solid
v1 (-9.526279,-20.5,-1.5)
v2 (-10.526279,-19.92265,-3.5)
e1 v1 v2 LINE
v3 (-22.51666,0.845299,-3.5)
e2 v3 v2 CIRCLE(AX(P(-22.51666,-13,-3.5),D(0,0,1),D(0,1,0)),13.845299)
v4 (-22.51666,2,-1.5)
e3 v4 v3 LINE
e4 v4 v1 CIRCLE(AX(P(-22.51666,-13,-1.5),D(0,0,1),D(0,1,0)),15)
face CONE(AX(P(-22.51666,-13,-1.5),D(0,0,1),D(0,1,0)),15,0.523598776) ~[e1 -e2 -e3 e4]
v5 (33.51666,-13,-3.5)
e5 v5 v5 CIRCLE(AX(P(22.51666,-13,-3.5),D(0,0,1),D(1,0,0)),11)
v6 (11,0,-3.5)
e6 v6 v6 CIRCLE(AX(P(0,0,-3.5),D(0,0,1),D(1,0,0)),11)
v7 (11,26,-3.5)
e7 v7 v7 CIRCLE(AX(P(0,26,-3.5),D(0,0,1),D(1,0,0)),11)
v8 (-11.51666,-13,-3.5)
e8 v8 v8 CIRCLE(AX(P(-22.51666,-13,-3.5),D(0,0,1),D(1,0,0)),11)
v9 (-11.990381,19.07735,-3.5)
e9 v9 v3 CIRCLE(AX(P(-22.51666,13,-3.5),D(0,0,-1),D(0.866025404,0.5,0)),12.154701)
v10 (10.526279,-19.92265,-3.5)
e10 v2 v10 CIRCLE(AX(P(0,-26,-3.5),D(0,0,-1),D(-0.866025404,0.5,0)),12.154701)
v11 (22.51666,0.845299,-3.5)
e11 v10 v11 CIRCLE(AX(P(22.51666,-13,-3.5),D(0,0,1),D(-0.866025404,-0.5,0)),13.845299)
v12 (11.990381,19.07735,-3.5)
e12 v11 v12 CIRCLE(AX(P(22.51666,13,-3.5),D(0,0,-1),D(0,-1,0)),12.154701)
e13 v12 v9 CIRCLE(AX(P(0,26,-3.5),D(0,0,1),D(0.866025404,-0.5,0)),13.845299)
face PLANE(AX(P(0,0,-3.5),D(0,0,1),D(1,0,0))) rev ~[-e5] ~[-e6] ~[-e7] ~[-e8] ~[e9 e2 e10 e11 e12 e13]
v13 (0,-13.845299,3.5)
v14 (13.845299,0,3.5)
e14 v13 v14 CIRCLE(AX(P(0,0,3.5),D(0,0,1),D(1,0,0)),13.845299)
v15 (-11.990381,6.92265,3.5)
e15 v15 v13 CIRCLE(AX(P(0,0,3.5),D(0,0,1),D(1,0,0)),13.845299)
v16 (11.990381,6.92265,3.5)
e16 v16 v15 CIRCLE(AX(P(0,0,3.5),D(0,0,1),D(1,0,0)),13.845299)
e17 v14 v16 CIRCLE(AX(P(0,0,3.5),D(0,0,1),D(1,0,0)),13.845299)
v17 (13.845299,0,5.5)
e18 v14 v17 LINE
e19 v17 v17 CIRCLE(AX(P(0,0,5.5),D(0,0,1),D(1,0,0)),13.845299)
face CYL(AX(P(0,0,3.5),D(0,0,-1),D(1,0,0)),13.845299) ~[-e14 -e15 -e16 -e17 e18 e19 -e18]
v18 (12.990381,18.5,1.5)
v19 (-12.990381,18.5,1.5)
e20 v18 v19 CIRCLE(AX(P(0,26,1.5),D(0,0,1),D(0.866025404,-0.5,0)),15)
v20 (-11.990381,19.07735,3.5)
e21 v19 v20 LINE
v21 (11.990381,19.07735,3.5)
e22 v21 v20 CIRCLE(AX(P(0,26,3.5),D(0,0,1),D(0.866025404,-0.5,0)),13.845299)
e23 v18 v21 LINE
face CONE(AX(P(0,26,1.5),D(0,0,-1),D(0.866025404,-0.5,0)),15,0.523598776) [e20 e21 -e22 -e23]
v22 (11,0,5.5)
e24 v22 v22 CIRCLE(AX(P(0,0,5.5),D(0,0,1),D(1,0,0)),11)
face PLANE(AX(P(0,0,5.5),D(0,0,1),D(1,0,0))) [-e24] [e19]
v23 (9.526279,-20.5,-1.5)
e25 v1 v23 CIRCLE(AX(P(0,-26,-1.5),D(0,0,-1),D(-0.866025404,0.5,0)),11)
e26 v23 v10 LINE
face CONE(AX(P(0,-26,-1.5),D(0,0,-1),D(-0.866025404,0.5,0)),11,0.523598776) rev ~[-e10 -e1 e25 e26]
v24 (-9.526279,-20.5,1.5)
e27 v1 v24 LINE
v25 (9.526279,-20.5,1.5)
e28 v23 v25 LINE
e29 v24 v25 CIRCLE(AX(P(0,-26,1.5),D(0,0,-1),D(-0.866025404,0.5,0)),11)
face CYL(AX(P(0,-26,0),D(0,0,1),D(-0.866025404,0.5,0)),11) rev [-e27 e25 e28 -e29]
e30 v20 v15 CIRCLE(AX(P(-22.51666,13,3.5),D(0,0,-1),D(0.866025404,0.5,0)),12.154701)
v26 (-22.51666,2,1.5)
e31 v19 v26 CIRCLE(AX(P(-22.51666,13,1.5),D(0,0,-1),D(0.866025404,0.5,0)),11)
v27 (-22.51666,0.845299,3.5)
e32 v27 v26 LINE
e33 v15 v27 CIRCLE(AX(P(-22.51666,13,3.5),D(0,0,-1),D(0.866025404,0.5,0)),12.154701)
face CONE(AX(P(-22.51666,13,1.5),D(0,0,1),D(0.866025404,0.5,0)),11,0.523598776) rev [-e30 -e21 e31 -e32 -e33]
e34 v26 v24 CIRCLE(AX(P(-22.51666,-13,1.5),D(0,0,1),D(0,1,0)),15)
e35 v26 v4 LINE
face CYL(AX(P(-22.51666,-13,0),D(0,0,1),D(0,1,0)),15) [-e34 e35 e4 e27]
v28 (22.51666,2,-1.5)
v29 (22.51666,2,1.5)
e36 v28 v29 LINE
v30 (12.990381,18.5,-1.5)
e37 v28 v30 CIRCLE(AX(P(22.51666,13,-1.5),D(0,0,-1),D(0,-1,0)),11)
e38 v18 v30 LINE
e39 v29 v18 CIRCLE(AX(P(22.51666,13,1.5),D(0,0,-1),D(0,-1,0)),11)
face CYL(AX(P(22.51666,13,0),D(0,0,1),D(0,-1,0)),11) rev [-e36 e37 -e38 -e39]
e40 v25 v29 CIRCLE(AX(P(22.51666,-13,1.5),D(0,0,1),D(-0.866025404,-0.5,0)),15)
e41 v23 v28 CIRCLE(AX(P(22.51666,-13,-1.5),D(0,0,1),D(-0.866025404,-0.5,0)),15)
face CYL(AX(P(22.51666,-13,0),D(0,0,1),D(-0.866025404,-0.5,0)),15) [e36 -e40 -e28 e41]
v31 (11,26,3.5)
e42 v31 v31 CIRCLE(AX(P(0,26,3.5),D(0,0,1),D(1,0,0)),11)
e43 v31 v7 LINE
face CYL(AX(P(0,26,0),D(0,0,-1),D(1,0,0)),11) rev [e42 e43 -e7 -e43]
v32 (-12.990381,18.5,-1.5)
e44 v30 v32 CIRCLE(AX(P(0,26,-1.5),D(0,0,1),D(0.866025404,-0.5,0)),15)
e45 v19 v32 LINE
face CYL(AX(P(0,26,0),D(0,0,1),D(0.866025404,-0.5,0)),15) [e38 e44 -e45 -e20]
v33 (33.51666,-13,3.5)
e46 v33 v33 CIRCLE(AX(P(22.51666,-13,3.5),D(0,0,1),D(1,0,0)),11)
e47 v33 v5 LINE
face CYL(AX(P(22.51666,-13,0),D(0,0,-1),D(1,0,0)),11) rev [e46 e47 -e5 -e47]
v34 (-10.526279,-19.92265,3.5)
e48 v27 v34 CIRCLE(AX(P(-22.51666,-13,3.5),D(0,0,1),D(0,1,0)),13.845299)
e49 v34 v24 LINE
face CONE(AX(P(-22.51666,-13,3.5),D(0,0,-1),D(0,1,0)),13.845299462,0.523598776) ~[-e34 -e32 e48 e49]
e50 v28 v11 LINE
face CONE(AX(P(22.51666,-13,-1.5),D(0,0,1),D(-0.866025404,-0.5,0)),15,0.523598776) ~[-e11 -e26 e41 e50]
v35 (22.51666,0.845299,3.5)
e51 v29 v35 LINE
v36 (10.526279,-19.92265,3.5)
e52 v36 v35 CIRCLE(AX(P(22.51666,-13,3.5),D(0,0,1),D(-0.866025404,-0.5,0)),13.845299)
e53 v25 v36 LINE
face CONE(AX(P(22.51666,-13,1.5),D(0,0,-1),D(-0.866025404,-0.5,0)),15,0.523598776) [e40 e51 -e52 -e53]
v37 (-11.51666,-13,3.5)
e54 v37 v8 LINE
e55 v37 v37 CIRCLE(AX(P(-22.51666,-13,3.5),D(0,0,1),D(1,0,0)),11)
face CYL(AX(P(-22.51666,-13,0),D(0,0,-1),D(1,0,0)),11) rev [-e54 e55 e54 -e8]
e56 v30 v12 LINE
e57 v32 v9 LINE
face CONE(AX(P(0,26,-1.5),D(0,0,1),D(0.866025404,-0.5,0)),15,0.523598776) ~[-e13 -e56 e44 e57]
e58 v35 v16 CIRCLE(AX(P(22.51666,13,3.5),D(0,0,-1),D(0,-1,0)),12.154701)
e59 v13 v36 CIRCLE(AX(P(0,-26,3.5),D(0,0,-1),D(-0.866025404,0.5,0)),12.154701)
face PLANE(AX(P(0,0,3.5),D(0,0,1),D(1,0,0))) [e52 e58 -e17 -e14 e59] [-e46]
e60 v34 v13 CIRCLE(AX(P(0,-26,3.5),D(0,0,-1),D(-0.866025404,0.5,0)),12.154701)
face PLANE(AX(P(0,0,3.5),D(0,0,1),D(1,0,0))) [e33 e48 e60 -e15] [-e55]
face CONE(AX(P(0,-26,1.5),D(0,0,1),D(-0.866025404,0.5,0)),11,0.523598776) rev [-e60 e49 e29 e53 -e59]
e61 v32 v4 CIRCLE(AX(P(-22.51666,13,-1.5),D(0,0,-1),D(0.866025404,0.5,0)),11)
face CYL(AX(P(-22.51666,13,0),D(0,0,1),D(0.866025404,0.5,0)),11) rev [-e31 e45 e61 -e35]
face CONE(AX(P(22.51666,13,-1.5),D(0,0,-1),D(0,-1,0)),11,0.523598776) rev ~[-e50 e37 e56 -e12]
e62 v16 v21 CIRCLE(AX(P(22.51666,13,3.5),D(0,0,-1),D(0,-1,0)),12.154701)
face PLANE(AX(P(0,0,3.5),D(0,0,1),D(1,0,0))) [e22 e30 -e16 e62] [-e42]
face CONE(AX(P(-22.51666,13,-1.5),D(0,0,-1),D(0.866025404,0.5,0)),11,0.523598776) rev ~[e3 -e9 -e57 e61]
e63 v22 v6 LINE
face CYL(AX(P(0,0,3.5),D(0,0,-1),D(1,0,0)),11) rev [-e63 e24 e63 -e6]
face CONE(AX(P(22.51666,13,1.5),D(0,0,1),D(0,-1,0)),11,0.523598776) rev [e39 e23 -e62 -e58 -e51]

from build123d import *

# Parameters (mm, degrees)
F0_R          = 11
F1_DEPTH      = 3.5
F2_R          = 11
F3_DEPTH      = 3.501
F3_DEPTH_BACK = 3.501
F4_T2_ANGLE   = 240
F4_T4_ANGLE   = 240
F4_T6_ANGLE   = 120
F4_T8_ANGLE   = 120
F4_T10_ANGLE  = 240
F4_T12_ANGLE  = 240
F4_T14_ANGLE  = 120
F4_T16_ANGLE  = 120
F4_T18_ANGLE  = 240
F4_T20_ANGLE  = 240
F4_T22_ANGLE  = 120
F4_T24_ANGLE  = 120
F5_R          = 13.8452994616
F5_R_2        = 11
F6_DEPTH      = 2


# Not quite as in the source:
# - a fillet or chamfer that OpenCascade refuses, or shapes differently, is made with other operations: its cross-section is extruded or revolved along the edge and cut away or added


with BuildPart() as f1:
    # F0 (on Top) → F1 (new body, symmetric)
    with BuildSketch(Plane.XY):
        with BuildLine():
            ThreePointArc((-22.5166604984, 2), (-35.5070415552, -20.5), (-9.5262794416, -20.5))
            ThreePointArc((-9.5262794416, -20.5), (0, -15), (9.5262794416, -20.5))
            ThreePointArc((9.5262794416, -20.5), (35.5070415552, -20.5), (22.5166604984, 2))
            ThreePointArc((22.5166604984, 2), (12.9903810568, 7.5), (12.9903810568, 18.5))
            ThreePointArc((12.9903810568, 18.5), (0, 41), (-12.9903810568, 18.5))
            ThreePointArc((-12.9903810568, 18.5), (-12.9903810568, 7.5), (-22.5166604984, 2))
        make_face()
        with Locations((-22.5166604984, -13)):
            Circle(F0_R, mode=Mode.SUBTRACT)
        with Locations((22.5166604984, -13)):
            Circle(F0_R, mode=Mode.SUBTRACT)
        Circle(F0_R, mode=Mode.SUBTRACT)
        with Locations((0, 26)):
            Circle(F0_R, mode=Mode.SUBTRACT)
    extrude(amount=F1_DEPTH, both=True)

    # F2 (on Top) → F3 (cut, two sides)
    with BuildSketch(Plane.XY) as f3_sk:
        Circle(F2_R)
    extrude(amount=-F3_DEPTH, mode=Mode.SUBTRACT)
    extrude(f3_sk.sketch, amount=F3_DEPTH_BACK, mode=Mode.SUBTRACT)

    # F4: chamfer of 2 x 1.1547005384 on 12 edges, made by hand

    # F4_s1 → F4_t2 (revolve, cut)
    with BuildSketch(Plane.YZ.offset(-22.5166604984)):
        Polygon((0.8452994616, 3.5), (2, 1.5), (2, 3.5), align=None)
    revolve(axis=Axis((-22.5166604984, -13, 3.5), (0, 0, 1)), revolution_arc=F4_T2_ANGLE, mode=Mode.SUBTRACT)

    # F4_s3 → F4_t4 (revolve, cut)
    with BuildSketch(Plane.YZ.offset(-22.5166604984)):
        Polygon((2, -1.5), (0.8452994616, -3.5), (2, -3.5), align=None)
    revolve(axis=Axis((-22.5166604984, -13, -3.5), (0, 0, 1)), revolution_arc=F4_T4_ANGLE, mode=Mode.SUBTRACT)

    # F4_s5 → F4_t6 (revolve, cut)
    with BuildSketch(Plane(origin=(-11.2583302492, 19.5, 0), x_dir=(0, 0, 1), z_dir=(-0.5, 0.8660254038, 0))):
        Polygon((-1.5, -2), (-3.5, -0.8452994616), (-3.5, -2), align=None)
    revolve(axis=Axis((-22.5166604984, 13, -3.5), (0, 0, -1)), revolution_arc=F4_T6_ANGLE, mode=Mode.SUBTRACT)

    # F4_s7 → F4_t8 (revolve, cut)
    with BuildSketch(Plane(origin=(-11.2583302492, 19.5, 0), x_dir=(0, 0, 1), z_dir=(-0.5, 0.8660254038, 0))):
        Polygon((1.5, -2), (3.5, -0.8452994616), (3.5, -2), align=None)
    revolve(axis=Axis((-22.5166604984, 13, 3.5), (0, 0, -1)), revolution_arc=F4_T8_ANGLE, mode=Mode.SUBTRACT)

    # F4_s9 → F4_t10 (revolve, cut)
    with BuildSketch(Plane(origin=(11.2583302492, 19.5, 0), x_dir=(0, 0, 1), z_dir=(-0.5, -0.8660254038, 0))):
        Polygon((-1.5, -2), (-3.5, -0.8452994616), (-3.5, -2), align=None)
    revolve(axis=Axis((0, 26, -3.5), (0, 0, 1)), revolution_arc=F4_T10_ANGLE, mode=Mode.SUBTRACT)

    # F4_s11 → F4_t12 (revolve, cut)
    with BuildSketch(Plane(origin=(11.2583302492, 19.5, 0), x_dir=(0, 0, 1), z_dir=(-0.5, -0.8660254038, 0))):
        Polygon((1.5, -2), (3.5, -0.8452994616), (3.5, -2), align=None)
    revolve(axis=Axis((0, 26, 3.5), (0, 0, 1)), revolution_arc=F4_T12_ANGLE, mode=Mode.SUBTRACT)

    # F4_s13 → F4_t14 (revolve, cut)
    with BuildSketch(Plane.YZ.offset(22.5166604984)):
        Polygon((2, -1.5), (0.8452994616, -3.5), (2, -3.5), align=None)
    revolve(axis=Axis((22.5166604984, 13, -3.5), (0, 0, -1)), revolution_arc=F4_T14_ANGLE, mode=Mode.SUBTRACT)

    # F4_s15 → F4_t16 (revolve, cut)
    with BuildSketch(Plane.YZ.offset(22.5166604984)):
        Polygon((2, 1.5), (0.8452994616, 3.5), (2, 3.5), align=None)
    revolve(axis=Axis((22.5166604984, 13, 3.5), (0, 0, -1)), revolution_arc=F4_T16_ANGLE, mode=Mode.SUBTRACT)

    # F4_s17 → F4_t18 (revolve, cut)
    with BuildSketch(Plane(origin=(11.2583302492, -19.5, 0), x_dir=(0, 0, 1), z_dir=(-0.5, 0.8660254038, 0))):
        Polygon((-1.5, -2), (-3.5, -0.8452994616), (-3.5, -2), align=None)
    revolve(axis=Axis((22.5166604984, -13, -3.5), (0, 0, 1)), revolution_arc=F4_T18_ANGLE, mode=Mode.SUBTRACT)

    # F4_s19 → F4_t20 (revolve, cut)
    with BuildSketch(Plane(origin=(11.2583302492, -19.5, 0), x_dir=(0, 0, 1), z_dir=(-0.5, 0.8660254038, 0))):
        Polygon((1.5, -2), (3.5, -0.8452994616), (3.5, -2), align=None)
    revolve(axis=Axis((22.5166604984, -13, 3.5), (0, 0, 1)), revolution_arc=F4_T20_ANGLE, mode=Mode.SUBTRACT)

    # F4_s21 → F4_t22 (revolve, cut)
    with BuildSketch(Plane(origin=(-11.2583302492, -19.5, 0), x_dir=(0, 0, 1), z_dir=(-0.5, -0.8660254038, 0))):
        Polygon((-1.5, -2), (-3.5, -0.8452994616), (-3.5, -2), align=None)
    revolve(axis=Axis((0, -26, -3.5), (0, 0, -1)), revolution_arc=F4_T22_ANGLE, mode=Mode.SUBTRACT)

    # F4_s23 → F4_t24 (revolve, cut)
    with BuildSketch(Plane(origin=(-11.2583302492, -19.5, 0), x_dir=(0, 0, 1), z_dir=(-0.5, -0.8660254038, 0))):
        Polygon((1.5, -2), (3.5, -0.8452994616), (3.5, -2), align=None)
    revolve(axis=Axis((0, -26, 3.5), (0, 0, -1)), revolution_arc=F4_T24_ANGLE, mode=Mode.SUBTRACT)

    # F5 (on face) → F6 (join)
    with BuildSketch(Plane.XY.offset(3.5)):
        Circle(F5_R)
        Circle(F5_R_2, mode=Mode.SUBTRACT)
    extrude(amount=F6_DEPTH)


solid = f1.part
